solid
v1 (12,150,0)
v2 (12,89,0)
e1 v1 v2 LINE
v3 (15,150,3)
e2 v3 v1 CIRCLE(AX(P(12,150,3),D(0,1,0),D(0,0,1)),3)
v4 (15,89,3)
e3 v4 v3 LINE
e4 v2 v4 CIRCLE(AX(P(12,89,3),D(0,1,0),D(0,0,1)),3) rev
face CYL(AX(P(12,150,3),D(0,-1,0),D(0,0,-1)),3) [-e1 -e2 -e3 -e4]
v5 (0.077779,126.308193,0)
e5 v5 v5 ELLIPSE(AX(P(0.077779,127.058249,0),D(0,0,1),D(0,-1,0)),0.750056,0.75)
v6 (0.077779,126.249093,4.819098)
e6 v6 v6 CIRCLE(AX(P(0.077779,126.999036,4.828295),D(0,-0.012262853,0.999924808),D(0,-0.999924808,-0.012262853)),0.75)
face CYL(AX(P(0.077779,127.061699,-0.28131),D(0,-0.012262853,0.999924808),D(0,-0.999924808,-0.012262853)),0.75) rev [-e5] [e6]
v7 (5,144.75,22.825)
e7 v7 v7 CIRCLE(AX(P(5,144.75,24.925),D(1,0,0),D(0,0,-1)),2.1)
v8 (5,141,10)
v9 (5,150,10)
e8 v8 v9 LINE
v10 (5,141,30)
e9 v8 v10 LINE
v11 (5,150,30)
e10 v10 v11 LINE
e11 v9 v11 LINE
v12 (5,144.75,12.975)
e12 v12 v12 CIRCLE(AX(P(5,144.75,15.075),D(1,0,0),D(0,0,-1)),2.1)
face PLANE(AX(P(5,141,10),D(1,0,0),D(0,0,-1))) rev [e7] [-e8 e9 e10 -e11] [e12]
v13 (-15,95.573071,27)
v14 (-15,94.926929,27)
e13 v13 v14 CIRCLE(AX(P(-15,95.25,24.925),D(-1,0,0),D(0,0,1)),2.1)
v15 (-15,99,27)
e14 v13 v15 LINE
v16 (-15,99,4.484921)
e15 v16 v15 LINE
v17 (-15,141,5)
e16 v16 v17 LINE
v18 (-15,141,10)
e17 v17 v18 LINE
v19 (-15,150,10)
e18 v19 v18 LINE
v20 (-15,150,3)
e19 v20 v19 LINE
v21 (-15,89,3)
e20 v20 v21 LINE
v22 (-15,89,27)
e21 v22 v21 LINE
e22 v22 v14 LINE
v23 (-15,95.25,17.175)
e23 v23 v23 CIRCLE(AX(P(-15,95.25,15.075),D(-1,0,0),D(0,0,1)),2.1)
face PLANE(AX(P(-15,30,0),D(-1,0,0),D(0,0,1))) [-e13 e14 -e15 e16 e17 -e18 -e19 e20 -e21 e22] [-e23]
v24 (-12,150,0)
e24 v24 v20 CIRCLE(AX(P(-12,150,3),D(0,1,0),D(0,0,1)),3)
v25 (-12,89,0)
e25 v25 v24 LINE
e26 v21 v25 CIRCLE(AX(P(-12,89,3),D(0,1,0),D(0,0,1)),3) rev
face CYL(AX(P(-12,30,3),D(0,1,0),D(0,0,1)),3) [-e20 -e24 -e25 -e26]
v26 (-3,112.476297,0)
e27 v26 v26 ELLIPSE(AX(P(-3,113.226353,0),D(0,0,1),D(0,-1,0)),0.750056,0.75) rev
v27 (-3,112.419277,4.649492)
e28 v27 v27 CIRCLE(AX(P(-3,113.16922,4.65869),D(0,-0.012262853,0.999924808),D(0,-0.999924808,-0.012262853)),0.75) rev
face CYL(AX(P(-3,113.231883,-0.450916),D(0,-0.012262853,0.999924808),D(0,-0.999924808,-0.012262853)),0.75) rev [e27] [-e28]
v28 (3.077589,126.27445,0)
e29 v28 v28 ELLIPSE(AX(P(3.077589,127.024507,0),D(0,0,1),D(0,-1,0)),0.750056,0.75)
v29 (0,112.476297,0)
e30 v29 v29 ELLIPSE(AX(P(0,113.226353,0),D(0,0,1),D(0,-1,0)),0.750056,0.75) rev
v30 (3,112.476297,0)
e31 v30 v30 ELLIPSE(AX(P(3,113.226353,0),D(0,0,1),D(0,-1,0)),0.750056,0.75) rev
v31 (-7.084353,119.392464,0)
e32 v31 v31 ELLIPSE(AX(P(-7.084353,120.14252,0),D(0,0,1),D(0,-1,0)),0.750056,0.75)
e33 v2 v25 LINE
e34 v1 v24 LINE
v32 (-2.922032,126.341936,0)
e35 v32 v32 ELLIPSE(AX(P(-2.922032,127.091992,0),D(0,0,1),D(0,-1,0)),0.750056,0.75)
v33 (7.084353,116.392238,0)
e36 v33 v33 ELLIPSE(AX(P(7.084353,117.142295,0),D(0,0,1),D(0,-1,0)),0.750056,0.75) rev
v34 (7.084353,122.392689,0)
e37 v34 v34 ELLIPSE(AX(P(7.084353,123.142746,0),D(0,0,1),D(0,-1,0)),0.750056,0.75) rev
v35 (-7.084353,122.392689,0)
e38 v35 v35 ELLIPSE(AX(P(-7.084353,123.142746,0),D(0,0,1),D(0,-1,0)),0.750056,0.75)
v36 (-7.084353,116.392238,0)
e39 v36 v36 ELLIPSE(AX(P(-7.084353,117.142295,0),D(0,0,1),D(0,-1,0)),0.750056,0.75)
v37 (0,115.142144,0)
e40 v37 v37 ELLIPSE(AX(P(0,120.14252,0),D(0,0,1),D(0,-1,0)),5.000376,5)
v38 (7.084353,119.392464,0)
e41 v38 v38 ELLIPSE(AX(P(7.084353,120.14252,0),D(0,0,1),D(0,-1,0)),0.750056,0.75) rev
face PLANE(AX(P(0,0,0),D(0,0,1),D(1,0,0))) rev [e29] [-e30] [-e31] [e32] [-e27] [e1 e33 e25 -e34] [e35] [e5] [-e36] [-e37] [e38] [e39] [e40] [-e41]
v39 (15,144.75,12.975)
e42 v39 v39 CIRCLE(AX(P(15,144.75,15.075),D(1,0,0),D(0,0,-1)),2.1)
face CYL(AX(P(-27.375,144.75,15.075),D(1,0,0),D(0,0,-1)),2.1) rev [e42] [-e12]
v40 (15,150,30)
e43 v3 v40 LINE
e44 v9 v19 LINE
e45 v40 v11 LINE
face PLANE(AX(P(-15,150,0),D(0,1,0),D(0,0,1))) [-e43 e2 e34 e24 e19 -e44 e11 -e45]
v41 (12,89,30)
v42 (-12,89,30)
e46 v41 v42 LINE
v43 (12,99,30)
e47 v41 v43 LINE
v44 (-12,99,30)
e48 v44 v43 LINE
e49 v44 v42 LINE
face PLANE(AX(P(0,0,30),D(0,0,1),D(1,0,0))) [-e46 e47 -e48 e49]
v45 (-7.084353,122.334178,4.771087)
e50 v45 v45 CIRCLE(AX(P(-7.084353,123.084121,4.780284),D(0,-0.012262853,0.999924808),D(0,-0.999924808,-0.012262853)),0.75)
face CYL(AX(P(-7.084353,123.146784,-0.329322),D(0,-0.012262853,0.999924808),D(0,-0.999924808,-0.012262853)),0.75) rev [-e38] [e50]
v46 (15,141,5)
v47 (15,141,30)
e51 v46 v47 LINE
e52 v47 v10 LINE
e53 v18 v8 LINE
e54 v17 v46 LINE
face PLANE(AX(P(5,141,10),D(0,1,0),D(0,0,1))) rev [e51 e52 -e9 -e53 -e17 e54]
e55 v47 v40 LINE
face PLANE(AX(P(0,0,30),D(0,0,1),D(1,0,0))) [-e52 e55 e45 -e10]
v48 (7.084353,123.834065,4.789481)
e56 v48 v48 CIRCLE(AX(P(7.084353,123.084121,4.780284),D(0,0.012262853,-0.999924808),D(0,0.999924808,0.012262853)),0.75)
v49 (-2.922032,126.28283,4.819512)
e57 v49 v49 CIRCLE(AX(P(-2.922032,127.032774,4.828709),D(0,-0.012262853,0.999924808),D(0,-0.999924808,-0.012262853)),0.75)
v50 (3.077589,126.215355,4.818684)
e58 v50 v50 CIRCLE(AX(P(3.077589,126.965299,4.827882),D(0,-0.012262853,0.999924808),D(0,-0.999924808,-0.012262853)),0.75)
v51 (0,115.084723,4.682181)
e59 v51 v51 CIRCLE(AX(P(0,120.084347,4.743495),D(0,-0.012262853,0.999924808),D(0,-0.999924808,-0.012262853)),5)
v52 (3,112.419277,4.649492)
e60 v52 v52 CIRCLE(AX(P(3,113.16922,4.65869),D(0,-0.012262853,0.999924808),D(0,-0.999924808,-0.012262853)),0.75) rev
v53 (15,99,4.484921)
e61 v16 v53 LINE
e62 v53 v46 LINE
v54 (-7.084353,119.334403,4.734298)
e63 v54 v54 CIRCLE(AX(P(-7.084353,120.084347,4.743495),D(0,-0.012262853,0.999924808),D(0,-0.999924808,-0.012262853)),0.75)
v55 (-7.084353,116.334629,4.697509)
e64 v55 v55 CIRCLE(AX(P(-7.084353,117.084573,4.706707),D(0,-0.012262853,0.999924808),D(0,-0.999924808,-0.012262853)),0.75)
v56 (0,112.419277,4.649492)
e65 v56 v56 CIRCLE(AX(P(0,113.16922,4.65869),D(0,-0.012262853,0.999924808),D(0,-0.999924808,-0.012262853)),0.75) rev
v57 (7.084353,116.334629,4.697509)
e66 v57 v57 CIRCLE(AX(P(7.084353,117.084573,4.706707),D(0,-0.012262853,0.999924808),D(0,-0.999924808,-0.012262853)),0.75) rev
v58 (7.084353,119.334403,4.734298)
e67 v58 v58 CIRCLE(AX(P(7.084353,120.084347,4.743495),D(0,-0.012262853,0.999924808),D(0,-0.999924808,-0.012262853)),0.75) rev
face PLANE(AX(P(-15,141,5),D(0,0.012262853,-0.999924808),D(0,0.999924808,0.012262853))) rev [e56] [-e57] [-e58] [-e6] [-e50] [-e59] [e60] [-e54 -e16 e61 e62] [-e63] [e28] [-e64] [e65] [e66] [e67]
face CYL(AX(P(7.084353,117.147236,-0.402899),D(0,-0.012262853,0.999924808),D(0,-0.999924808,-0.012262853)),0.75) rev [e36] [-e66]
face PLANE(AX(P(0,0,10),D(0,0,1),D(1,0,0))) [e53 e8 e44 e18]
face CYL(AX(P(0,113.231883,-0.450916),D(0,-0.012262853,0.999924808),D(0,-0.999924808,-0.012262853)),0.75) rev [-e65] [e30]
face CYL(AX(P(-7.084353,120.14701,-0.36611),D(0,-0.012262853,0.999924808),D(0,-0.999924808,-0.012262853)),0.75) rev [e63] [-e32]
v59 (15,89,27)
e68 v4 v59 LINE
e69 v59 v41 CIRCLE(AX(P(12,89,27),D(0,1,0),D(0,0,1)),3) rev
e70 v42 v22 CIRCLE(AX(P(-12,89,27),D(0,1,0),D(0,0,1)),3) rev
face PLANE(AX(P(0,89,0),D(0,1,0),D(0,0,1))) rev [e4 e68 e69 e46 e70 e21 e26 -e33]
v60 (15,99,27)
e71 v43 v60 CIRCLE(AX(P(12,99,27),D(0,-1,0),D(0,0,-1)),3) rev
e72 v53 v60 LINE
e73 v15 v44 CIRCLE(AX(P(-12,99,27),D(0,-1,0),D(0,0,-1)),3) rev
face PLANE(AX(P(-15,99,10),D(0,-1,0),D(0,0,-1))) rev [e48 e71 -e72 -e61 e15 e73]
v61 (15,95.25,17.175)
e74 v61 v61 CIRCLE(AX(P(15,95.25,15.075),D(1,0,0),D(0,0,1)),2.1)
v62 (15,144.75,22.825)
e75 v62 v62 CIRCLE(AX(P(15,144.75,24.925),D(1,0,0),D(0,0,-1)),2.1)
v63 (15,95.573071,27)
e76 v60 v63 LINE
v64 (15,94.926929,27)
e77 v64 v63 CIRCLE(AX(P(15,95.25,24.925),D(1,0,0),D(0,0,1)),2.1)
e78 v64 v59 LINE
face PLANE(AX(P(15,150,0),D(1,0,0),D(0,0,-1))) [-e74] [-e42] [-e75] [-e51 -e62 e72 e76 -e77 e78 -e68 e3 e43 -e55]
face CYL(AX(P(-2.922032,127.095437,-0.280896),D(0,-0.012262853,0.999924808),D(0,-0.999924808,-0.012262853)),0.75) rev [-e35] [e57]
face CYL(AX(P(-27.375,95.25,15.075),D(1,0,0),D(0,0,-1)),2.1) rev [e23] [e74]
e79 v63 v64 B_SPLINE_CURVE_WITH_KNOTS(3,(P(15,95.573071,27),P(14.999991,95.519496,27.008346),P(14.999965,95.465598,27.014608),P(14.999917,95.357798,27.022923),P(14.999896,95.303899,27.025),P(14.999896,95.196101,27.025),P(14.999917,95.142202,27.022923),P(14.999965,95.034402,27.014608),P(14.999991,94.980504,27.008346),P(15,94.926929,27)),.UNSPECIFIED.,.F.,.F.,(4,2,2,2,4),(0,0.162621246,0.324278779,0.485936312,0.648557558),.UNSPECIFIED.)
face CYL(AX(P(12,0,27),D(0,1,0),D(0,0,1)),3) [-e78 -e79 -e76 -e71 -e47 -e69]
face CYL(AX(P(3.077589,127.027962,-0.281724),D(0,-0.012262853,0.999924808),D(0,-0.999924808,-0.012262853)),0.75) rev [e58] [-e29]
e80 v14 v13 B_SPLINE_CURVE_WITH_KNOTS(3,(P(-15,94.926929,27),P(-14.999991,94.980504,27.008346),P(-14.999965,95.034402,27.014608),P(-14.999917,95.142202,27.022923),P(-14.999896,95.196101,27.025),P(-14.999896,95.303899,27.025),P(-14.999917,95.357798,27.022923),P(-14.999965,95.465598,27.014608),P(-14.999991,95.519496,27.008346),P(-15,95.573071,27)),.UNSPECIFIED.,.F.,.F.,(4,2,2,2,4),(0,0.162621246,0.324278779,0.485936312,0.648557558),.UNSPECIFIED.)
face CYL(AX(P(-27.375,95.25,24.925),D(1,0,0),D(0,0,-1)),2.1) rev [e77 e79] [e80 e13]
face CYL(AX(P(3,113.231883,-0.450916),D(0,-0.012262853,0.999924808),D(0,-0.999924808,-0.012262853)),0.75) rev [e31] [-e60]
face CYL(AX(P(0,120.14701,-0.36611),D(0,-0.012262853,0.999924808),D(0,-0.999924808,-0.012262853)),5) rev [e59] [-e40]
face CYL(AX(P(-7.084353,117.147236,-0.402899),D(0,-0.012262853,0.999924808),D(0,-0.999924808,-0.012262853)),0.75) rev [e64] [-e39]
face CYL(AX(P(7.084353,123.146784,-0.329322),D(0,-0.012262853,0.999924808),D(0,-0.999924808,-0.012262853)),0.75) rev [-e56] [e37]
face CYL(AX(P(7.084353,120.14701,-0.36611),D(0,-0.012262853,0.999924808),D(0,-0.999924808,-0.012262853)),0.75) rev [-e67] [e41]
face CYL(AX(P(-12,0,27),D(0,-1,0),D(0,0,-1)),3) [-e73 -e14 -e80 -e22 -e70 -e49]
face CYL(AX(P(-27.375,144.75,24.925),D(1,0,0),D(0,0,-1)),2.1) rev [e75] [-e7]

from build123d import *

# Parameters (mm, degrees)
SKETCH_1_W          = 44.75
SKETCH_1_H          = 50
EXTRUDE_1_DEPTH     = 30
SHELL_1_T           = 5
FILLET_1_R          = 5
SKETCH_2_R          = 0.75
CUT_EXTRUDE_1_DEPTH = 70.264438928
SKETCH_3_R          = 5
CUT_EXTRUDE_2_DEPTH = 70.264438928
EXTRUDE_2_DEPTH     = 30
CUT_EXTRUDE_3_DEPTH = 20
SKETCH_7_R          = 2.1
CUT_EXTRUDE_4_DEPTH = 159.731347329
SKETCH_8_W          = 18
SKETCH_8_H          = 45
CUT_EXTRUDE_5_DEPTH = 10
SKETCH_9_W          = 18
SKETCH_9_H          = 45
CUT_EXTRUDE_6_DEPTH = 10
FILLET_2_R          = 3
SKETCH_10_W         = 85.567589514
SKETCH_10_H         = 51.13951385
CUT_EXTRUDE_7_DEPTH = 122.018141743
CUT_EXTRUDE_8_DEPTH = 156.88457272
SKETCH_12_R         = 5
SKETCH_12_R_2       = 0.75
CUT_EXTRUDE_9_DEPTH = 154.138857117


with BuildPart() as part:
    # 草图1 → 凸台-拉伸1 (new body)
    with BuildSketch(Plane.XY):
        Rectangle(SKETCH_1_W, SKETCH_1_H)
    extrude(amount=EXTRUDE_1_DEPTH)

    # 抽壳1
    shell_1_openings = [part.faces().sort_by_distance(p)[0] for p in [
        (0, -25, 15),
        (0, 0, 0),
        (0, 0, 30),
    ]]
    offset(amount=SHELL_1_T, openings=shell_1_openings, kind=Kind.INTERSECTION)

    # 圆角1
    # the kernel refuses this fillet: 5 mm, written as the material it takes off along each edge
    with BuildSketch(Plane(origin=(-27.375, 30, -12.5), x_dir=(1, 0, 0), z_dir=(0, 0, 1)), Plane(origin=(-27.375, -25, 42.5), x_dir=(1, 0, 0), z_dir=(0, 0, -1)), Plane(origin=(27.375, -25, -12.5), x_dir=(-1, 0, 0), z_dir=(0, 0, 1)), Plane(origin=(27.375, 30, 42.5), x_dir=(-1, 0, 0), z_dir=(0, 0, -1))) as fillet_1_piece_1:
        with BuildLine():
            CenterArc((FILLET_1_R, -FILLET_1_R), FILLET_1_R, 90, 90)
            Line((0, -FILLET_1_R), (0, 0))
            Line((0, 0), (FILLET_1_R, 0))
        make_face()
    extrude(amount=55, mode=Mode.SUBTRACT)
    with BuildSketch(Plane(origin=(-27.375, -37.5, 30), x_dir=(1, 0, 0), z_dir=(0, 1, 0)), Plane(origin=(27.375, 42.5, 30), x_dir=(-1, 0, 0), z_dir=(0, -1, 0))) as fillet_1_piece_2:
        with BuildLine():
            CenterArc((FILLET_1_R, FILLET_1_R), FILLET_1_R, 180, 90)
            Line((0, FILLET_1_R), (0, 0))
            Line((0, 0), (FILLET_1_R, 0))
        make_face()
    extrude(amount=80, mode=Mode.SUBTRACT)
    with BuildSketch(Plane(origin=(-27.375, -37.5, 0), x_dir=(1, 0, 0), z_dir=(0, 1, 0)), Plane(origin=(27.375, 42.5, 0), x_dir=(-1, 0, 0), z_dir=(0, -1, 0))) as fillet_1_piece_3:
        with BuildLine():
            CenterArc((FILLET_1_R, -FILLET_1_R), FILLET_1_R, 90, 90)
            Line((0, -FILLET_1_R), (0, 0))
            Line((0, 0), (FILLET_1_R, 0))
        make_face()
    extrude(amount=80, mode=Mode.SUBTRACT)

    # 草图2 → 切除-拉伸1 (cut, through all)
    with BuildSketch(Plane.ZY.offset(27.375)):
        with Locations(Location((15, 7, 0), (0, 0, 270))):
            Circle(SKETCH_2_R)
        with Locations(Location((12, 7, 0), (0, 0, 270))):
            Circle(SKETCH_2_R)
        with Locations(Location((18, 7, 0), (0, 0, 270))):
            Circle(SKETCH_2_R)
        with Locations(Location((8, -3, 0), (0, 0, 90))):
            Circle(SKETCH_2_R)
        with Locations(Location((8, 0, 0), (0, 0, 90))):
            Circle(SKETCH_2_R)
        with Locations(Location((8, 3, 0), (0, 0, 90))):
            Circle(SKETCH_2_R)
        with Locations(Location((12, -7, 0), (0, 0, 90))):
            Circle(SKETCH_2_R)
        with Locations(Location((15, -7, 0), (0, 0, 90))):
            Circle(SKETCH_2_R)
        with Locations(Location((18, -7, 0), (0, 0, 90))):
            Circle(SKETCH_2_R)
        with Locations(Location((22, -3, 0), (0, 0, 270))):
            Circle(SKETCH_2_R)
        with Locations(Location((22, 0, 0), (0, 0, 270))):
            Circle(SKETCH_2_R)
        with Locations(Location((22, 3, 0), (0, 0, 270))):
            Circle(SKETCH_2_R)
    extrude(amount=-CUT_EXTRUDE_1_DEPTH, mode=Mode.SUBTRACT)

    # 草图3 → 切除-拉伸2 (cut, through all)
    with BuildSketch(Plane(origin=(27.375, 0, 0), x_dir=(0, 0, -1), z_dir=(1, 0, 0))):
        with Locations(Location((-15, 0, 0), (0, 0, 90))):
            Circle(SKETCH_3_R)
    extrude(amount=-CUT_EXTRUDE_2_DEPTH, mode=Mode.SUBTRACT)

    # 草图4 → 凸台-拉伸2 (add)
    with BuildSketch(Plane.XY.offset(30)):
        Polygon((0, 30), (-15, 30), (-15, 150), (15, 150), (15, 30), align=None)
    extrude(amount=-EXTRUDE_2_DEPTH)

    # 草图6 → 切除-拉伸3 (cut)
    with BuildSketch(Plane.XY.offset(30)):
        Polygon((-15, 99), (15, 99), (15, 141), (5, 141), (5, 150), (-15, 150), (-15, 141), align=None)
    extrude(amount=-CUT_EXTRUDE_3_DEPTH, mode=Mode.SUBTRACT)

    # 草图7 → 切除-拉伸4 (cut, through all)
    with BuildSketch(Plane(origin=(15, 0, 0), x_dir=(0, 0, -1), z_dir=(1, 0, 0))):
        with Locations((-24.925, 144.75)):
            Circle(SKETCH_7_R)
        with Locations((-15.075, 144.75)):
            Circle(SKETCH_7_R)
        with Locations(Location((-15.075, 95.25, 0), (0, 0, 180))):
            Circle(SKETCH_7_R)
        with Locations(Location((-24.925, 95.25, 0), (0, 0, 180))):
            Circle(SKETCH_7_R)
    extrude(amount=-CUT_EXTRUDE_4_DEPTH, mode=Mode.SUBTRACT)

    # 草图8 → 切除-拉伸5 (cut)
    with BuildSketch(Plane.XY.offset(30)):
        with Locations((0, 64.5)):
            Rectangle(SKETCH_8_W, SKETCH_8_H)
    extrude(amount=-CUT_EXTRUDE_5_DEPTH, mode=Mode.SUBTRACT)

    # 草图9 → 切除-拉伸6 (cut)
    with BuildSketch(Plane(origin=(0, 0, 0), x_dir=(-1, 0, 0), z_dir=(0, 0, -1))):
        with Locations((0, 65)):
            Rectangle(SKETCH_9_W, SKETCH_9_H)
    extrude(amount=-CUT_EXTRUDE_6_DEPTH, mode=Mode.SUBTRACT)

    # 圆角2
    fillet_2_edges = [part.edges().sort_by_distance(p)[0] for p in [
        (-15, 90, 0),
        (15, 90, 0),
        (15, 64.5, 30),
        (-15, 64.5, 30),
    ]]
    fillet(fillet_2_edges, radius=FILLET_2_R)

    # 草图10 → 切除-拉伸7 (cut, through all)
    with BuildSketch(Plane(origin=(0, 89, 0), x_dir=(1, 0, 0), z_dir=(0, 1, 0))):
        with Locations((0, -19.677859547)):
            Rectangle(SKETCH_10_W, SKETCH_10_H)
    extrude(amount=-CUT_EXTRUDE_7_DEPTH, mode=Mode.SUBTRACT)

    # 草图11 → 切除-拉伸8 (cut, through all)
    with BuildSketch(Plane(origin=(15, 0, 0), x_dir=(0, 0, -1), z_dir=(1, 0, 0))):
        Polygon((-10, 99), (-10, 141), (-5, 141), (-4.484921434, 99), align=None)
    extrude(amount=-CUT_EXTRUDE_8_DEPTH, mode=Mode.SUBTRACT)

    # 草图12 → 切除-拉伸9 (cut, through all)
    with BuildSketch(Plane(origin=(0, -0.040106419, 3.270315816), x_dir=(1, 0, 0), z_dir=(0, -0.012262853244216906, 0.9999248083882663))):
        with Locations(Location((0, 120.133486449, 0), (0, 0, 270))):
            Circle(SKETCH_12_R)
        with Locations(Location((7.084353343, 120.133486449, 0), (0, 0, 270))):
            Circle(SKETCH_12_R_2)
        with Locations(Location((7.084353343, 117.133486449, 0), (0, 0, 270))):
            Circle(SKETCH_12_R_2)
        with Locations(Location((3.077588855, 127.014955444, 0), (0, 0, 270))):
            Circle(SKETCH_12_R_2)
        with Locations(Location((-2.922031664, 127.082435984, 0), (0, 0, 270))):
            Circle(SKETCH_12_R_2)
        with Locations(Location((-7.084353343, 123.133486449, 0), (0, 0, 270))):
            Circle(SKETCH_12_R_2)
        with Locations(Location((-7.084353343, 117.133486449, 0), (0, 0, 270))):
            Circle(SKETCH_12_R_2)
        with Locations(Location((-3, 113.217839792, 0), (0, 0, 270))):
            Circle(SKETCH_12_R_2)
        with Locations(Location((0, 113.217839792, 0), (0, 0, 270))):
            Circle(SKETCH_12_R_2)
        with Locations(Location((3, 113.217839792, 0), (0, 0, 270))):
            Circle(SKETCH_12_R_2)
        with Locations(Location((7.084353343, 123.133486449, 0), (0, 0, 270))):
            Circle(SKETCH_12_R_2)
        with Locations(Location((0.077778595, 127.048695714, 0), (0, 0, 270))):
            Circle(SKETCH_12_R_2)
        with Locations(Location((-7.084353343, 120.133486449, 0), (0, 0, 270))):
            Circle(SKETCH_12_R_2)
    extrude(amount=-CUT_EXTRUDE_9_DEPTH, mode=Mode.SUBTRACT)


solid = part.part
